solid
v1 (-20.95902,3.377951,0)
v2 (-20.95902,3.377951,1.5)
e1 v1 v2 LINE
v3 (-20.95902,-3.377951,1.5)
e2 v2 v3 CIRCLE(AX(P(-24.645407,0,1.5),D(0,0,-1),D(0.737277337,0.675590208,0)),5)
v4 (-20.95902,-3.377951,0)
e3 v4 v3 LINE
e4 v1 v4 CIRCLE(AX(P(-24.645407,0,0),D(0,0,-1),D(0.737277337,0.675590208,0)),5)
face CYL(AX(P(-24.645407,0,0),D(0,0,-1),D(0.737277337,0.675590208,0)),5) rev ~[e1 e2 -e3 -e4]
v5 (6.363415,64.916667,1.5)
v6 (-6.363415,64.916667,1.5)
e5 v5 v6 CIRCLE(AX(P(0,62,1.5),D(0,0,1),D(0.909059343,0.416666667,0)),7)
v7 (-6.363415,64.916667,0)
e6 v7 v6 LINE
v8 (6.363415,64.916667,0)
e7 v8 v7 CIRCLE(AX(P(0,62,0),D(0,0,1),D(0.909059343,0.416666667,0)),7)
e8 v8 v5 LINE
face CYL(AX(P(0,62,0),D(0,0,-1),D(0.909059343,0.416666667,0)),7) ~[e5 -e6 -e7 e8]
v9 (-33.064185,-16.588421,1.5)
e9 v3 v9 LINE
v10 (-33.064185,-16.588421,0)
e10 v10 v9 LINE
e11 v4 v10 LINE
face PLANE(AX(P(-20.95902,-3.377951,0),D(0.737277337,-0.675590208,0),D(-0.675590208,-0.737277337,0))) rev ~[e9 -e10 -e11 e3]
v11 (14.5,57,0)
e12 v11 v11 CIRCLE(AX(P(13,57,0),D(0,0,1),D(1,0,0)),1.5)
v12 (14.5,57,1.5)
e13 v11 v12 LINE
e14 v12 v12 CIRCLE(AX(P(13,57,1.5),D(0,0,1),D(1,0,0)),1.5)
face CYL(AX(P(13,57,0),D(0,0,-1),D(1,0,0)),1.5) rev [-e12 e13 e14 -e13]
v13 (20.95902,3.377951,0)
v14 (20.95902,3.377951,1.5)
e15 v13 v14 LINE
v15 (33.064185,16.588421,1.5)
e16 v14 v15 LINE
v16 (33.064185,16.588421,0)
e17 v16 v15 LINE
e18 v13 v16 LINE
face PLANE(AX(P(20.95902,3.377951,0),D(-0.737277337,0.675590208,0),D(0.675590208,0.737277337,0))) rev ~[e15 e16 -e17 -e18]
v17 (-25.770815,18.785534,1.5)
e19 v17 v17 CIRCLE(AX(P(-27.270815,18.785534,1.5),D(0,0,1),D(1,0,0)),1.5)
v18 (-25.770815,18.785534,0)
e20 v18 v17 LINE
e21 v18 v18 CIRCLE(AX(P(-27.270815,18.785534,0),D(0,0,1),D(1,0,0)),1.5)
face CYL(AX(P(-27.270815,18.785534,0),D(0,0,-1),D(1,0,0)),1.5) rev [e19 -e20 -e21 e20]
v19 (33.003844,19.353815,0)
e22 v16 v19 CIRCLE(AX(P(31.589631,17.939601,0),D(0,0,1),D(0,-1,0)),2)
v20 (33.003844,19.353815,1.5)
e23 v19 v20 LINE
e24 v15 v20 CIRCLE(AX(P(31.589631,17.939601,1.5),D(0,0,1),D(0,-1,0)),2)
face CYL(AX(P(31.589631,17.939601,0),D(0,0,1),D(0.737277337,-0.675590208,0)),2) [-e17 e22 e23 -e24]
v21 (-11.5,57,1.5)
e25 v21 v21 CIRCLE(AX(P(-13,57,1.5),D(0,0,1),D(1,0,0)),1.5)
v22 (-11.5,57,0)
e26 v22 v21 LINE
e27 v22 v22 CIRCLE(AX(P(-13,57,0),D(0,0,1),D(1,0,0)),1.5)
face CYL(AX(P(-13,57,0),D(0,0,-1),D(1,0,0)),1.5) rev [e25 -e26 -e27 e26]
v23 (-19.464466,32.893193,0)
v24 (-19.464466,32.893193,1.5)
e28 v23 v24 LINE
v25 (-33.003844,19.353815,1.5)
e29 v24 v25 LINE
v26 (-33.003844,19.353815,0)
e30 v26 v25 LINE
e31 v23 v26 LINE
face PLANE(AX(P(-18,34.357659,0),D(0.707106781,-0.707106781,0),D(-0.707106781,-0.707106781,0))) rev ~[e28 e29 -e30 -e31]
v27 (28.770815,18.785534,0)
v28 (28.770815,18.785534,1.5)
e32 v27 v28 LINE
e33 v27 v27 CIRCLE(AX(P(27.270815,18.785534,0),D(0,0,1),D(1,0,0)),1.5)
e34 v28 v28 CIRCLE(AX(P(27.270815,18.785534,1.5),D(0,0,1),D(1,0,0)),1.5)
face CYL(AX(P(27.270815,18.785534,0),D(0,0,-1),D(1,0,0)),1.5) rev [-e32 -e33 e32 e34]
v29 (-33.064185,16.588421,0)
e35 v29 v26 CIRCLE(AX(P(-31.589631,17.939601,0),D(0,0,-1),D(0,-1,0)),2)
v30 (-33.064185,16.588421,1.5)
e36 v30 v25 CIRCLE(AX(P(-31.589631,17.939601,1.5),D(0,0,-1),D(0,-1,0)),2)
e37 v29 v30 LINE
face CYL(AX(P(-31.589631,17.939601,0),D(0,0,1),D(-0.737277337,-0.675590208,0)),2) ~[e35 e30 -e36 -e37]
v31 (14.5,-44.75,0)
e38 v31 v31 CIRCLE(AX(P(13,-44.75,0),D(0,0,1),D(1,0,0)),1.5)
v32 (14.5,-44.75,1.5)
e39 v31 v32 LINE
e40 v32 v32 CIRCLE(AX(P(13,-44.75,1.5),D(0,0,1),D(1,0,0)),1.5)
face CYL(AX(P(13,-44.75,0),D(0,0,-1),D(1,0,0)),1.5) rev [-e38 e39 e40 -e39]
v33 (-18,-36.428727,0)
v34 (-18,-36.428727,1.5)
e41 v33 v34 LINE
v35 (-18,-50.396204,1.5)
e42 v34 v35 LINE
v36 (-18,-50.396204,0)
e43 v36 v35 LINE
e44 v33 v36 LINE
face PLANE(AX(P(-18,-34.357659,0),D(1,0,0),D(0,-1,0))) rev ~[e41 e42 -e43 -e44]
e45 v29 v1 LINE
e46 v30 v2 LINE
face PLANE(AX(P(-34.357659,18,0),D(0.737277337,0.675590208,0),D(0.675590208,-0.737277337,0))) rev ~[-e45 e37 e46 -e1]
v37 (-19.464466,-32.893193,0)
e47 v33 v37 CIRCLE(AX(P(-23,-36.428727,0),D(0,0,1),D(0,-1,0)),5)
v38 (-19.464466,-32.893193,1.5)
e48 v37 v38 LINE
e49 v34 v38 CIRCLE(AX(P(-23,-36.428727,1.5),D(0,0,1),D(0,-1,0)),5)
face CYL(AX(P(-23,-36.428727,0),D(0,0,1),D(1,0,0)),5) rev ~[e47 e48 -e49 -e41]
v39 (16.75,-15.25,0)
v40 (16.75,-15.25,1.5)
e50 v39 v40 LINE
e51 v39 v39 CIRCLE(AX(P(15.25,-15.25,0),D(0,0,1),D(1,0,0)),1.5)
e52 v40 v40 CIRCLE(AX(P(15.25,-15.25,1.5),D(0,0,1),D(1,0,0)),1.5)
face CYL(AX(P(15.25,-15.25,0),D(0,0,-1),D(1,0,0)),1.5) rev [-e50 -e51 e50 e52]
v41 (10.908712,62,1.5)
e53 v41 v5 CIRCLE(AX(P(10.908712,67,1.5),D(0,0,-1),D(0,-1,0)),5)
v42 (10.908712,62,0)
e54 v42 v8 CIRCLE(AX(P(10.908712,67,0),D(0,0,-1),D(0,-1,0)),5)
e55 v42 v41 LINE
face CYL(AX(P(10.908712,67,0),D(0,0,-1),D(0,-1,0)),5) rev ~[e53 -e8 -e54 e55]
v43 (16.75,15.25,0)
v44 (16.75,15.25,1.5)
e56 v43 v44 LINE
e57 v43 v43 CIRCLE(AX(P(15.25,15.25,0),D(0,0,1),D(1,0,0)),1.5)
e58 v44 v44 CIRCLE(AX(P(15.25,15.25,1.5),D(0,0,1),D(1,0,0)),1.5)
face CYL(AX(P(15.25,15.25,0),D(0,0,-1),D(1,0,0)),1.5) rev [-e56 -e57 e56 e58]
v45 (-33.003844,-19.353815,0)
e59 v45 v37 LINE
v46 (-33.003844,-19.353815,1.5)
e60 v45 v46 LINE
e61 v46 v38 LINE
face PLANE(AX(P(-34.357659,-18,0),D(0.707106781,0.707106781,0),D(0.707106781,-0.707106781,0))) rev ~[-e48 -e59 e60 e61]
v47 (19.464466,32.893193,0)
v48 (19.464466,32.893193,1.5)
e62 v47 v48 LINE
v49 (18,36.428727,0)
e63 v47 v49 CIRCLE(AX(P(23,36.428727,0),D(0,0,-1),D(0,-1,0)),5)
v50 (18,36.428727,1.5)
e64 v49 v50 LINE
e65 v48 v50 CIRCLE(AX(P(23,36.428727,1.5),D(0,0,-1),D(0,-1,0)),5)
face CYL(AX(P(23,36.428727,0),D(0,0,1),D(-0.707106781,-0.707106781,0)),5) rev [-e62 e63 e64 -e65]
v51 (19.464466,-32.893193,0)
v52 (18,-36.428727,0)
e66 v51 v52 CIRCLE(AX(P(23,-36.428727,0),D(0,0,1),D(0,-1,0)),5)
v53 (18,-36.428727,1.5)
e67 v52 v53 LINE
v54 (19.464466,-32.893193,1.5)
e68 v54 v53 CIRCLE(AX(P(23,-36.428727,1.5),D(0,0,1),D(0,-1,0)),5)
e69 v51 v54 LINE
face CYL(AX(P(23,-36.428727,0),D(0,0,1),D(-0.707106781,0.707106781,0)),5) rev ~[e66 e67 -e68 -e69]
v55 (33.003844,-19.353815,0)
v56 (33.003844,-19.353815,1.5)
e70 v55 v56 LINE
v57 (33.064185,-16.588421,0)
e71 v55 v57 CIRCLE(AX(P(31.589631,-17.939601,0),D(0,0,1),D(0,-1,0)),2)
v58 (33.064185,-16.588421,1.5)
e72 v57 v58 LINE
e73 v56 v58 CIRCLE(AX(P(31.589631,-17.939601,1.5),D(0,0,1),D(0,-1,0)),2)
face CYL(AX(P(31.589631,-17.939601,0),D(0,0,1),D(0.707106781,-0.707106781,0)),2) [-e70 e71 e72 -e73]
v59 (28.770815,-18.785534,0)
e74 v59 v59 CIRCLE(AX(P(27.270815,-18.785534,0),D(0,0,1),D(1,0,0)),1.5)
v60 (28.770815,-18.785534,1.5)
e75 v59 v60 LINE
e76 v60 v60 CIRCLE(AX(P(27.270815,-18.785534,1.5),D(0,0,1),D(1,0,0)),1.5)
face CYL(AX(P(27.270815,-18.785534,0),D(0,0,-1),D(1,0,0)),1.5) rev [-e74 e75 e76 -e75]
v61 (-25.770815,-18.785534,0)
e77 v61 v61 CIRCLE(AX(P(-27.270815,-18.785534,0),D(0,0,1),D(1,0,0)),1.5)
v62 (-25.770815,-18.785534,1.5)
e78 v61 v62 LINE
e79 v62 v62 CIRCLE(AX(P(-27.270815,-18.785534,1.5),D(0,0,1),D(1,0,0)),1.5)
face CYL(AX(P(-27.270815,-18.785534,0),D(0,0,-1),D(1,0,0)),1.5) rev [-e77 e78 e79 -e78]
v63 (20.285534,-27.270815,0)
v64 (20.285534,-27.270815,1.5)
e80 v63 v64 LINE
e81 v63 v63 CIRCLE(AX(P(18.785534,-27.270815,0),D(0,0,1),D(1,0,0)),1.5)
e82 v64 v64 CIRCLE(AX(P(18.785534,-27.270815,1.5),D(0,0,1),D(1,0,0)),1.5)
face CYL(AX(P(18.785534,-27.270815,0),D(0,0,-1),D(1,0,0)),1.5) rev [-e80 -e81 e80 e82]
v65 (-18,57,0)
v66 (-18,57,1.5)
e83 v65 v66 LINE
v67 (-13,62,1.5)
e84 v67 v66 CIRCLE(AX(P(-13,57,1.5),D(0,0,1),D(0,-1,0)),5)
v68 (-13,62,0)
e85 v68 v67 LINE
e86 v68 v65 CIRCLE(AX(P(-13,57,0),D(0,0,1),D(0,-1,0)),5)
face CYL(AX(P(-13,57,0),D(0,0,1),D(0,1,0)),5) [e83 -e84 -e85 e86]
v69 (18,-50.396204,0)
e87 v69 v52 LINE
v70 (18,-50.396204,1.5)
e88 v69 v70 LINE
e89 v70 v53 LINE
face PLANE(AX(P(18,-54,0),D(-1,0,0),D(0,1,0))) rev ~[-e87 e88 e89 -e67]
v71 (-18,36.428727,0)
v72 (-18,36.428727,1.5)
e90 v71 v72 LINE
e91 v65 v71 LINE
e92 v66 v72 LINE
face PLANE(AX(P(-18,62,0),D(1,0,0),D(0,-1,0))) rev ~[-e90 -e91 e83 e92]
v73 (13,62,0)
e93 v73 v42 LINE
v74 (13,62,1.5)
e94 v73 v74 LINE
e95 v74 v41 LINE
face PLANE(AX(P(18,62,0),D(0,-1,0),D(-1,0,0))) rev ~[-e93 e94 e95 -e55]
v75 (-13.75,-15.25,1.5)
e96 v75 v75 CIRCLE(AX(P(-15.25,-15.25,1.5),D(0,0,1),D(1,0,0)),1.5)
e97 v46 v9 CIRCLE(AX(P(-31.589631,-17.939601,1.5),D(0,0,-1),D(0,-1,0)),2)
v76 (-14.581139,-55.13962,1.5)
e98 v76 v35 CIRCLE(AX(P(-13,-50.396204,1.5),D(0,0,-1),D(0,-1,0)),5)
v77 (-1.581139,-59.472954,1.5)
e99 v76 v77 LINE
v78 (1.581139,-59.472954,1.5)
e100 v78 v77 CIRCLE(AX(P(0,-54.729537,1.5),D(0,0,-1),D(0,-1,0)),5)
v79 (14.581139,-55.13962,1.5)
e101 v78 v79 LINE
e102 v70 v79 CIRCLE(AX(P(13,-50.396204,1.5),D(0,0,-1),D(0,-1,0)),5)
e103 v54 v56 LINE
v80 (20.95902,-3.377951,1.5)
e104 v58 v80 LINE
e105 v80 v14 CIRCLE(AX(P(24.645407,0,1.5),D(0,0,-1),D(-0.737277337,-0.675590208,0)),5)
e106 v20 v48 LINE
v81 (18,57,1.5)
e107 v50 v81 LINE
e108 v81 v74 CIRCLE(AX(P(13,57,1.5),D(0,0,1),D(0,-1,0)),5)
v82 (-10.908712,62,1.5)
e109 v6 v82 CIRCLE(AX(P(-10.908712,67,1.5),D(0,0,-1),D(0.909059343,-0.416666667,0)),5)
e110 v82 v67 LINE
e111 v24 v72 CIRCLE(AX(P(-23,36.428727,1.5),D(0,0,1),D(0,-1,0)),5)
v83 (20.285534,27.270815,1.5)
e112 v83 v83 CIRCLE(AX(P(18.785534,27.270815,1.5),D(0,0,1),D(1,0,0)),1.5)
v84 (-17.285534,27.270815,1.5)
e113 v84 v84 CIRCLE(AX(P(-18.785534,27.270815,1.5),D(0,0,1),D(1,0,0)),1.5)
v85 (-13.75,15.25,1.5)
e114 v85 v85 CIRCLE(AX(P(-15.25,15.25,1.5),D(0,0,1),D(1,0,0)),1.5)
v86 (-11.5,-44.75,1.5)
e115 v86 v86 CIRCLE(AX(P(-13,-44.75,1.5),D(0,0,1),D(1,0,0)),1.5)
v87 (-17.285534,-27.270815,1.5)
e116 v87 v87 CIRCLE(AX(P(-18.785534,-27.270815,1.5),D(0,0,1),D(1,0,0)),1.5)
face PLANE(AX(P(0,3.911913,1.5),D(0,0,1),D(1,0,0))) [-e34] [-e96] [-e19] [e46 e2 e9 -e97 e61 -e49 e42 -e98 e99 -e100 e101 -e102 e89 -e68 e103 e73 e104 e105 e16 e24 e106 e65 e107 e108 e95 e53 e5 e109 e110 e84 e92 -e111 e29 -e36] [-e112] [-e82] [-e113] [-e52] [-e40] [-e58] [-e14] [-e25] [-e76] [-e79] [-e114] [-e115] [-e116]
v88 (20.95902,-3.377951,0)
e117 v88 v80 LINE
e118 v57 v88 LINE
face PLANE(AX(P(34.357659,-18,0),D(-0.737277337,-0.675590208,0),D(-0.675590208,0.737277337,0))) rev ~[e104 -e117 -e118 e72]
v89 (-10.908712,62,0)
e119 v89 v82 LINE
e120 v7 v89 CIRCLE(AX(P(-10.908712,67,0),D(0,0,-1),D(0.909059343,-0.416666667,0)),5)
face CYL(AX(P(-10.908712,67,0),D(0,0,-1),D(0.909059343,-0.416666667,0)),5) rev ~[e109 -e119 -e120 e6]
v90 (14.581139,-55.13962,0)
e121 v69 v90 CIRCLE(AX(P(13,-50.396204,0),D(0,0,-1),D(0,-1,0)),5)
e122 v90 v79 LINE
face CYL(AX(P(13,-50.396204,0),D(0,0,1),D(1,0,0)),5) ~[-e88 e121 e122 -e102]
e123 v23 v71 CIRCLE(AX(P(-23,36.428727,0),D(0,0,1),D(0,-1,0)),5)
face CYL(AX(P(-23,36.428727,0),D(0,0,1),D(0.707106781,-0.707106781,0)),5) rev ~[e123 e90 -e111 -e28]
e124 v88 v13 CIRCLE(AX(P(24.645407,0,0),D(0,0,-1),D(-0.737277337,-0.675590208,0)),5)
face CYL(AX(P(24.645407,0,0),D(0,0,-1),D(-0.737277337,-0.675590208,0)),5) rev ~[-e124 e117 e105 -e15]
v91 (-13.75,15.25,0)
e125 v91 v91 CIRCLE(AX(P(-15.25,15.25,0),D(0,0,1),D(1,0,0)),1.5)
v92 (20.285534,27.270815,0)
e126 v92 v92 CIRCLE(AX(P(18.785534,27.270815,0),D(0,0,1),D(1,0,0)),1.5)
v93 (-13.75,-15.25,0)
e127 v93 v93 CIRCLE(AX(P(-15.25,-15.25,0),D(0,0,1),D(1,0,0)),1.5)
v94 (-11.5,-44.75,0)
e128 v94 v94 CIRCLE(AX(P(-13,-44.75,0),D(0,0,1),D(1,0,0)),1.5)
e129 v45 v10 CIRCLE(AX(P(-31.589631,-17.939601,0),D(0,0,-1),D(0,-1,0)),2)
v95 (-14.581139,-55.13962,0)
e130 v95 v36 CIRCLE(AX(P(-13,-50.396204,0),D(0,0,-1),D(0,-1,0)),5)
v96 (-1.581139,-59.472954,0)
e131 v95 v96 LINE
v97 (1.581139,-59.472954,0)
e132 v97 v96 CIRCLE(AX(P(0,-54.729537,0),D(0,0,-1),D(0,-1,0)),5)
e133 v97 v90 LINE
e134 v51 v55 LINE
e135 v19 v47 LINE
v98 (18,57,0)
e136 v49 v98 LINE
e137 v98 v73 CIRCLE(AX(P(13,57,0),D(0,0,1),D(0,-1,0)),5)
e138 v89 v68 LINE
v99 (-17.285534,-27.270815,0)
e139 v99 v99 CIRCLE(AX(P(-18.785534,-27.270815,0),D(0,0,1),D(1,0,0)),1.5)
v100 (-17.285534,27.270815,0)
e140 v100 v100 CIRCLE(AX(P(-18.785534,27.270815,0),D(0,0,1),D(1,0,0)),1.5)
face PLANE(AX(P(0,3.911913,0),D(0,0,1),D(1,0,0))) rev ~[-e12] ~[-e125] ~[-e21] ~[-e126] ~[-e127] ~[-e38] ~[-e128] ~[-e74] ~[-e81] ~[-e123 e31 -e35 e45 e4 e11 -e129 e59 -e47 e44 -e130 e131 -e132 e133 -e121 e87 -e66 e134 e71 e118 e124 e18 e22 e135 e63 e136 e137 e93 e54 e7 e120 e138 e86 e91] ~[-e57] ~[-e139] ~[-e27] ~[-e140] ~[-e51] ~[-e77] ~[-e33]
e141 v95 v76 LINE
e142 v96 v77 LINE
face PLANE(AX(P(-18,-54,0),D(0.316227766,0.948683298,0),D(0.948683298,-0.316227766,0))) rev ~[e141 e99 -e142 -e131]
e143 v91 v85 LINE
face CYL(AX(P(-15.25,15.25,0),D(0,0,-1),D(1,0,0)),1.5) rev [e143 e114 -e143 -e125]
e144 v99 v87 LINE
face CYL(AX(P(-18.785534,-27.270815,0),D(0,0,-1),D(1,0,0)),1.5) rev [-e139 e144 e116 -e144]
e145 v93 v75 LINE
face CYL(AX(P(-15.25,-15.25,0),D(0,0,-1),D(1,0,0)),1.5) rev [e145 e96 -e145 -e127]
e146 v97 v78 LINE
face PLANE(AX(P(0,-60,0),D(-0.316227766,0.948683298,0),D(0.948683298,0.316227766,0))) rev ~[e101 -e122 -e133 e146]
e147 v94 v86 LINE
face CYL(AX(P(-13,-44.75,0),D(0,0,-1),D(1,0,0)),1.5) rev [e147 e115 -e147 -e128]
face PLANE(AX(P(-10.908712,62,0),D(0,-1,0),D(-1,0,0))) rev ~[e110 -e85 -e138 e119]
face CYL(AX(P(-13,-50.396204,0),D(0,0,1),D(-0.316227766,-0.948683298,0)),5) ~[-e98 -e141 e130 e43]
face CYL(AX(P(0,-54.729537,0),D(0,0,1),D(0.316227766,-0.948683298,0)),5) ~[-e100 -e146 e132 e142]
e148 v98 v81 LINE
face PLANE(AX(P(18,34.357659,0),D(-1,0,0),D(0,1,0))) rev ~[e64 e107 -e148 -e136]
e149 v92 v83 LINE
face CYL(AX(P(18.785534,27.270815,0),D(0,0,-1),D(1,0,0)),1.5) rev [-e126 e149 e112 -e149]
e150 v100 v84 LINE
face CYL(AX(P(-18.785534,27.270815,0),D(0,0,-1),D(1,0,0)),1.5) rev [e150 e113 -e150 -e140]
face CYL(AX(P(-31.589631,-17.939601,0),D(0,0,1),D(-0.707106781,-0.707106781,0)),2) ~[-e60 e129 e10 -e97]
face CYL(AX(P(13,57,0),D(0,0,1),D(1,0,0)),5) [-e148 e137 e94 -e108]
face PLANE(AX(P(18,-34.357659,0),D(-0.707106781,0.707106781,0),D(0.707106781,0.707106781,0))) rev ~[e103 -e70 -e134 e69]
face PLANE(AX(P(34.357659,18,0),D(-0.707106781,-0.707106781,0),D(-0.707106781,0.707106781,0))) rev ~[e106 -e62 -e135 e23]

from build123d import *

# Parameters (mm, degrees)
F0_R     = 1.5
F1_DEPTH = 1.5
F2_R     = 5
F3_R     = 2


with BuildPart() as f1:
    # F0 (on Top) → F1 (new body)
    with BuildSketch(Plane.XY):
        with BuildLine():
            Line((34.3576592932, -18), (20.9590200014, -3.3779510381))
            ThreePointArc((20.9590200014, -3.3779510381), (19.6454066855, 0), (20.9590200014, 3.3779510381))
            Line((20.9590200014, 3.3779510381), (34.3576592932, 18))
            Line((34.3576592932, 18), (18, 34.3576592932))
            Line((18, 34.3576592932), (18, 62))
            Line((18, 62), (10.9087121146, 62))
            ThreePointArc((10.9087121146, 62), (8.2084034903, 62.7918729423), (6.3634154002, 64.9166666667))
            ThreePointArc((6.3634154002, 64.9166666667), (0, 69), (-6.3634154002, 64.9166666667))
            ThreePointArc((-6.3634154002, 64.9166666667), (-8.2084034903, 62.7918729423), (-10.9087121146, 62))
            Line((-10.9087121146, 62), (-18, 62))
            Line((-18, 62), (-18, 34.3576592932))
            Line((-18, 34.3576592932), (-34.3576592932, 18))
            Line((-34.3576592932, 18), (-20.9590200014, 3.3779510381))
            ThreePointArc((-20.9590200014, 3.3779510381), (-19.6454066855, 0), (-20.9590200014, -3.3779510381))
            Line((-20.9590200014, -3.3779510381), (-34.3576592932, -18))
            Line((-34.3576592932, -18), (-18, -34.3576592932))
            Line((-18, -34.3576592932), (-18, -54))
            Line((-18, -54), (0, -60))
            Line((0, -60), (18, -54))
            Line((18, -54), (18, -34.3576592932))
            Line((18, -34.3576592932), (34.3576592932, -18))
        make_face()
        with Locations((-13, -44.75)):
            Circle(F0_R, mode=Mode.SUBTRACT)
        with Locations((-27.2708152802, -18.7855339059)):
            Circle(F0_R, mode=Mode.SUBTRACT)
        with Locations((-18.7855339059, -27.2708152802)):
            Circle(F0_R, mode=Mode.SUBTRACT)
        with Locations((-15.25, -15.25)):
            Circle(F0_R, mode=Mode.SUBTRACT)
        with Locations((13, -44.75)):
            Circle(F0_R, mode=Mode.SUBTRACT)
        with Locations((15.25, -15.25)):
            Circle(F0_R, mode=Mode.SUBTRACT)
        with Locations((18.7855339059, -27.2708152802)):
            Circle(F0_R, mode=Mode.SUBTRACT)
        with Locations((27.2708152802, -18.7855339059)):
            Circle(F0_R, mode=Mode.SUBTRACT)
        with Locations((-27.2708152802, 18.7855339059)):
            Circle(F0_R, mode=Mode.SUBTRACT)
        with Locations((-18.7855339059, 27.2708152802)):
            Circle(F0_R, mode=Mode.SUBTRACT)
        with Locations((-15.25, 15.25)):
            Circle(F0_R, mode=Mode.SUBTRACT)
        with Locations((-13, 57)):
            Circle(F0_R, mode=Mode.SUBTRACT)
        with Locations((15.25, 15.25)):
            Circle(F0_R, mode=Mode.SUBTRACT)
        with Locations((27.2708152802, 18.7855339059)):
            Circle(F0_R, mode=Mode.SUBTRACT)
        with Locations((18.7855339059, 27.2708152802)):
            Circle(F0_R, mode=Mode.SUBTRACT)
        with Locations((13, 57)):
            Circle(F0_R, mode=Mode.SUBTRACT)
    extrude(amount=F1_DEPTH)

    # F2
    f2_edges = [f1.edges().sort_by_distance(p)[0] for p in [
        (-18, -54, 0.75),
        (0, -60, 0.75),
        (18, -54, 0.75),
        (-18, 62, 0.75),
        (-18, 34.357659, 0.75),
        (-18, -34.357659, 0.75),
        (18, -34.357659, 0.75),
        (18, 34.357659, 0.75),
        (18, 62, 0.75),
    ]]
    fillet(f2_edges, radius=F2_R)

    # F3
    f3_edges = [f1.edges().sort_by_distance(p)[0] for p in [
        (-34.357659, -18, 0.75),
        (-34.357659, 18, 0.75),
        (34.357659, 18, 0.75),
        (34.357659, -18, 0.75),
    ]]
    fillet(f3_edges, radius=F3_R)


solid = f1.part
